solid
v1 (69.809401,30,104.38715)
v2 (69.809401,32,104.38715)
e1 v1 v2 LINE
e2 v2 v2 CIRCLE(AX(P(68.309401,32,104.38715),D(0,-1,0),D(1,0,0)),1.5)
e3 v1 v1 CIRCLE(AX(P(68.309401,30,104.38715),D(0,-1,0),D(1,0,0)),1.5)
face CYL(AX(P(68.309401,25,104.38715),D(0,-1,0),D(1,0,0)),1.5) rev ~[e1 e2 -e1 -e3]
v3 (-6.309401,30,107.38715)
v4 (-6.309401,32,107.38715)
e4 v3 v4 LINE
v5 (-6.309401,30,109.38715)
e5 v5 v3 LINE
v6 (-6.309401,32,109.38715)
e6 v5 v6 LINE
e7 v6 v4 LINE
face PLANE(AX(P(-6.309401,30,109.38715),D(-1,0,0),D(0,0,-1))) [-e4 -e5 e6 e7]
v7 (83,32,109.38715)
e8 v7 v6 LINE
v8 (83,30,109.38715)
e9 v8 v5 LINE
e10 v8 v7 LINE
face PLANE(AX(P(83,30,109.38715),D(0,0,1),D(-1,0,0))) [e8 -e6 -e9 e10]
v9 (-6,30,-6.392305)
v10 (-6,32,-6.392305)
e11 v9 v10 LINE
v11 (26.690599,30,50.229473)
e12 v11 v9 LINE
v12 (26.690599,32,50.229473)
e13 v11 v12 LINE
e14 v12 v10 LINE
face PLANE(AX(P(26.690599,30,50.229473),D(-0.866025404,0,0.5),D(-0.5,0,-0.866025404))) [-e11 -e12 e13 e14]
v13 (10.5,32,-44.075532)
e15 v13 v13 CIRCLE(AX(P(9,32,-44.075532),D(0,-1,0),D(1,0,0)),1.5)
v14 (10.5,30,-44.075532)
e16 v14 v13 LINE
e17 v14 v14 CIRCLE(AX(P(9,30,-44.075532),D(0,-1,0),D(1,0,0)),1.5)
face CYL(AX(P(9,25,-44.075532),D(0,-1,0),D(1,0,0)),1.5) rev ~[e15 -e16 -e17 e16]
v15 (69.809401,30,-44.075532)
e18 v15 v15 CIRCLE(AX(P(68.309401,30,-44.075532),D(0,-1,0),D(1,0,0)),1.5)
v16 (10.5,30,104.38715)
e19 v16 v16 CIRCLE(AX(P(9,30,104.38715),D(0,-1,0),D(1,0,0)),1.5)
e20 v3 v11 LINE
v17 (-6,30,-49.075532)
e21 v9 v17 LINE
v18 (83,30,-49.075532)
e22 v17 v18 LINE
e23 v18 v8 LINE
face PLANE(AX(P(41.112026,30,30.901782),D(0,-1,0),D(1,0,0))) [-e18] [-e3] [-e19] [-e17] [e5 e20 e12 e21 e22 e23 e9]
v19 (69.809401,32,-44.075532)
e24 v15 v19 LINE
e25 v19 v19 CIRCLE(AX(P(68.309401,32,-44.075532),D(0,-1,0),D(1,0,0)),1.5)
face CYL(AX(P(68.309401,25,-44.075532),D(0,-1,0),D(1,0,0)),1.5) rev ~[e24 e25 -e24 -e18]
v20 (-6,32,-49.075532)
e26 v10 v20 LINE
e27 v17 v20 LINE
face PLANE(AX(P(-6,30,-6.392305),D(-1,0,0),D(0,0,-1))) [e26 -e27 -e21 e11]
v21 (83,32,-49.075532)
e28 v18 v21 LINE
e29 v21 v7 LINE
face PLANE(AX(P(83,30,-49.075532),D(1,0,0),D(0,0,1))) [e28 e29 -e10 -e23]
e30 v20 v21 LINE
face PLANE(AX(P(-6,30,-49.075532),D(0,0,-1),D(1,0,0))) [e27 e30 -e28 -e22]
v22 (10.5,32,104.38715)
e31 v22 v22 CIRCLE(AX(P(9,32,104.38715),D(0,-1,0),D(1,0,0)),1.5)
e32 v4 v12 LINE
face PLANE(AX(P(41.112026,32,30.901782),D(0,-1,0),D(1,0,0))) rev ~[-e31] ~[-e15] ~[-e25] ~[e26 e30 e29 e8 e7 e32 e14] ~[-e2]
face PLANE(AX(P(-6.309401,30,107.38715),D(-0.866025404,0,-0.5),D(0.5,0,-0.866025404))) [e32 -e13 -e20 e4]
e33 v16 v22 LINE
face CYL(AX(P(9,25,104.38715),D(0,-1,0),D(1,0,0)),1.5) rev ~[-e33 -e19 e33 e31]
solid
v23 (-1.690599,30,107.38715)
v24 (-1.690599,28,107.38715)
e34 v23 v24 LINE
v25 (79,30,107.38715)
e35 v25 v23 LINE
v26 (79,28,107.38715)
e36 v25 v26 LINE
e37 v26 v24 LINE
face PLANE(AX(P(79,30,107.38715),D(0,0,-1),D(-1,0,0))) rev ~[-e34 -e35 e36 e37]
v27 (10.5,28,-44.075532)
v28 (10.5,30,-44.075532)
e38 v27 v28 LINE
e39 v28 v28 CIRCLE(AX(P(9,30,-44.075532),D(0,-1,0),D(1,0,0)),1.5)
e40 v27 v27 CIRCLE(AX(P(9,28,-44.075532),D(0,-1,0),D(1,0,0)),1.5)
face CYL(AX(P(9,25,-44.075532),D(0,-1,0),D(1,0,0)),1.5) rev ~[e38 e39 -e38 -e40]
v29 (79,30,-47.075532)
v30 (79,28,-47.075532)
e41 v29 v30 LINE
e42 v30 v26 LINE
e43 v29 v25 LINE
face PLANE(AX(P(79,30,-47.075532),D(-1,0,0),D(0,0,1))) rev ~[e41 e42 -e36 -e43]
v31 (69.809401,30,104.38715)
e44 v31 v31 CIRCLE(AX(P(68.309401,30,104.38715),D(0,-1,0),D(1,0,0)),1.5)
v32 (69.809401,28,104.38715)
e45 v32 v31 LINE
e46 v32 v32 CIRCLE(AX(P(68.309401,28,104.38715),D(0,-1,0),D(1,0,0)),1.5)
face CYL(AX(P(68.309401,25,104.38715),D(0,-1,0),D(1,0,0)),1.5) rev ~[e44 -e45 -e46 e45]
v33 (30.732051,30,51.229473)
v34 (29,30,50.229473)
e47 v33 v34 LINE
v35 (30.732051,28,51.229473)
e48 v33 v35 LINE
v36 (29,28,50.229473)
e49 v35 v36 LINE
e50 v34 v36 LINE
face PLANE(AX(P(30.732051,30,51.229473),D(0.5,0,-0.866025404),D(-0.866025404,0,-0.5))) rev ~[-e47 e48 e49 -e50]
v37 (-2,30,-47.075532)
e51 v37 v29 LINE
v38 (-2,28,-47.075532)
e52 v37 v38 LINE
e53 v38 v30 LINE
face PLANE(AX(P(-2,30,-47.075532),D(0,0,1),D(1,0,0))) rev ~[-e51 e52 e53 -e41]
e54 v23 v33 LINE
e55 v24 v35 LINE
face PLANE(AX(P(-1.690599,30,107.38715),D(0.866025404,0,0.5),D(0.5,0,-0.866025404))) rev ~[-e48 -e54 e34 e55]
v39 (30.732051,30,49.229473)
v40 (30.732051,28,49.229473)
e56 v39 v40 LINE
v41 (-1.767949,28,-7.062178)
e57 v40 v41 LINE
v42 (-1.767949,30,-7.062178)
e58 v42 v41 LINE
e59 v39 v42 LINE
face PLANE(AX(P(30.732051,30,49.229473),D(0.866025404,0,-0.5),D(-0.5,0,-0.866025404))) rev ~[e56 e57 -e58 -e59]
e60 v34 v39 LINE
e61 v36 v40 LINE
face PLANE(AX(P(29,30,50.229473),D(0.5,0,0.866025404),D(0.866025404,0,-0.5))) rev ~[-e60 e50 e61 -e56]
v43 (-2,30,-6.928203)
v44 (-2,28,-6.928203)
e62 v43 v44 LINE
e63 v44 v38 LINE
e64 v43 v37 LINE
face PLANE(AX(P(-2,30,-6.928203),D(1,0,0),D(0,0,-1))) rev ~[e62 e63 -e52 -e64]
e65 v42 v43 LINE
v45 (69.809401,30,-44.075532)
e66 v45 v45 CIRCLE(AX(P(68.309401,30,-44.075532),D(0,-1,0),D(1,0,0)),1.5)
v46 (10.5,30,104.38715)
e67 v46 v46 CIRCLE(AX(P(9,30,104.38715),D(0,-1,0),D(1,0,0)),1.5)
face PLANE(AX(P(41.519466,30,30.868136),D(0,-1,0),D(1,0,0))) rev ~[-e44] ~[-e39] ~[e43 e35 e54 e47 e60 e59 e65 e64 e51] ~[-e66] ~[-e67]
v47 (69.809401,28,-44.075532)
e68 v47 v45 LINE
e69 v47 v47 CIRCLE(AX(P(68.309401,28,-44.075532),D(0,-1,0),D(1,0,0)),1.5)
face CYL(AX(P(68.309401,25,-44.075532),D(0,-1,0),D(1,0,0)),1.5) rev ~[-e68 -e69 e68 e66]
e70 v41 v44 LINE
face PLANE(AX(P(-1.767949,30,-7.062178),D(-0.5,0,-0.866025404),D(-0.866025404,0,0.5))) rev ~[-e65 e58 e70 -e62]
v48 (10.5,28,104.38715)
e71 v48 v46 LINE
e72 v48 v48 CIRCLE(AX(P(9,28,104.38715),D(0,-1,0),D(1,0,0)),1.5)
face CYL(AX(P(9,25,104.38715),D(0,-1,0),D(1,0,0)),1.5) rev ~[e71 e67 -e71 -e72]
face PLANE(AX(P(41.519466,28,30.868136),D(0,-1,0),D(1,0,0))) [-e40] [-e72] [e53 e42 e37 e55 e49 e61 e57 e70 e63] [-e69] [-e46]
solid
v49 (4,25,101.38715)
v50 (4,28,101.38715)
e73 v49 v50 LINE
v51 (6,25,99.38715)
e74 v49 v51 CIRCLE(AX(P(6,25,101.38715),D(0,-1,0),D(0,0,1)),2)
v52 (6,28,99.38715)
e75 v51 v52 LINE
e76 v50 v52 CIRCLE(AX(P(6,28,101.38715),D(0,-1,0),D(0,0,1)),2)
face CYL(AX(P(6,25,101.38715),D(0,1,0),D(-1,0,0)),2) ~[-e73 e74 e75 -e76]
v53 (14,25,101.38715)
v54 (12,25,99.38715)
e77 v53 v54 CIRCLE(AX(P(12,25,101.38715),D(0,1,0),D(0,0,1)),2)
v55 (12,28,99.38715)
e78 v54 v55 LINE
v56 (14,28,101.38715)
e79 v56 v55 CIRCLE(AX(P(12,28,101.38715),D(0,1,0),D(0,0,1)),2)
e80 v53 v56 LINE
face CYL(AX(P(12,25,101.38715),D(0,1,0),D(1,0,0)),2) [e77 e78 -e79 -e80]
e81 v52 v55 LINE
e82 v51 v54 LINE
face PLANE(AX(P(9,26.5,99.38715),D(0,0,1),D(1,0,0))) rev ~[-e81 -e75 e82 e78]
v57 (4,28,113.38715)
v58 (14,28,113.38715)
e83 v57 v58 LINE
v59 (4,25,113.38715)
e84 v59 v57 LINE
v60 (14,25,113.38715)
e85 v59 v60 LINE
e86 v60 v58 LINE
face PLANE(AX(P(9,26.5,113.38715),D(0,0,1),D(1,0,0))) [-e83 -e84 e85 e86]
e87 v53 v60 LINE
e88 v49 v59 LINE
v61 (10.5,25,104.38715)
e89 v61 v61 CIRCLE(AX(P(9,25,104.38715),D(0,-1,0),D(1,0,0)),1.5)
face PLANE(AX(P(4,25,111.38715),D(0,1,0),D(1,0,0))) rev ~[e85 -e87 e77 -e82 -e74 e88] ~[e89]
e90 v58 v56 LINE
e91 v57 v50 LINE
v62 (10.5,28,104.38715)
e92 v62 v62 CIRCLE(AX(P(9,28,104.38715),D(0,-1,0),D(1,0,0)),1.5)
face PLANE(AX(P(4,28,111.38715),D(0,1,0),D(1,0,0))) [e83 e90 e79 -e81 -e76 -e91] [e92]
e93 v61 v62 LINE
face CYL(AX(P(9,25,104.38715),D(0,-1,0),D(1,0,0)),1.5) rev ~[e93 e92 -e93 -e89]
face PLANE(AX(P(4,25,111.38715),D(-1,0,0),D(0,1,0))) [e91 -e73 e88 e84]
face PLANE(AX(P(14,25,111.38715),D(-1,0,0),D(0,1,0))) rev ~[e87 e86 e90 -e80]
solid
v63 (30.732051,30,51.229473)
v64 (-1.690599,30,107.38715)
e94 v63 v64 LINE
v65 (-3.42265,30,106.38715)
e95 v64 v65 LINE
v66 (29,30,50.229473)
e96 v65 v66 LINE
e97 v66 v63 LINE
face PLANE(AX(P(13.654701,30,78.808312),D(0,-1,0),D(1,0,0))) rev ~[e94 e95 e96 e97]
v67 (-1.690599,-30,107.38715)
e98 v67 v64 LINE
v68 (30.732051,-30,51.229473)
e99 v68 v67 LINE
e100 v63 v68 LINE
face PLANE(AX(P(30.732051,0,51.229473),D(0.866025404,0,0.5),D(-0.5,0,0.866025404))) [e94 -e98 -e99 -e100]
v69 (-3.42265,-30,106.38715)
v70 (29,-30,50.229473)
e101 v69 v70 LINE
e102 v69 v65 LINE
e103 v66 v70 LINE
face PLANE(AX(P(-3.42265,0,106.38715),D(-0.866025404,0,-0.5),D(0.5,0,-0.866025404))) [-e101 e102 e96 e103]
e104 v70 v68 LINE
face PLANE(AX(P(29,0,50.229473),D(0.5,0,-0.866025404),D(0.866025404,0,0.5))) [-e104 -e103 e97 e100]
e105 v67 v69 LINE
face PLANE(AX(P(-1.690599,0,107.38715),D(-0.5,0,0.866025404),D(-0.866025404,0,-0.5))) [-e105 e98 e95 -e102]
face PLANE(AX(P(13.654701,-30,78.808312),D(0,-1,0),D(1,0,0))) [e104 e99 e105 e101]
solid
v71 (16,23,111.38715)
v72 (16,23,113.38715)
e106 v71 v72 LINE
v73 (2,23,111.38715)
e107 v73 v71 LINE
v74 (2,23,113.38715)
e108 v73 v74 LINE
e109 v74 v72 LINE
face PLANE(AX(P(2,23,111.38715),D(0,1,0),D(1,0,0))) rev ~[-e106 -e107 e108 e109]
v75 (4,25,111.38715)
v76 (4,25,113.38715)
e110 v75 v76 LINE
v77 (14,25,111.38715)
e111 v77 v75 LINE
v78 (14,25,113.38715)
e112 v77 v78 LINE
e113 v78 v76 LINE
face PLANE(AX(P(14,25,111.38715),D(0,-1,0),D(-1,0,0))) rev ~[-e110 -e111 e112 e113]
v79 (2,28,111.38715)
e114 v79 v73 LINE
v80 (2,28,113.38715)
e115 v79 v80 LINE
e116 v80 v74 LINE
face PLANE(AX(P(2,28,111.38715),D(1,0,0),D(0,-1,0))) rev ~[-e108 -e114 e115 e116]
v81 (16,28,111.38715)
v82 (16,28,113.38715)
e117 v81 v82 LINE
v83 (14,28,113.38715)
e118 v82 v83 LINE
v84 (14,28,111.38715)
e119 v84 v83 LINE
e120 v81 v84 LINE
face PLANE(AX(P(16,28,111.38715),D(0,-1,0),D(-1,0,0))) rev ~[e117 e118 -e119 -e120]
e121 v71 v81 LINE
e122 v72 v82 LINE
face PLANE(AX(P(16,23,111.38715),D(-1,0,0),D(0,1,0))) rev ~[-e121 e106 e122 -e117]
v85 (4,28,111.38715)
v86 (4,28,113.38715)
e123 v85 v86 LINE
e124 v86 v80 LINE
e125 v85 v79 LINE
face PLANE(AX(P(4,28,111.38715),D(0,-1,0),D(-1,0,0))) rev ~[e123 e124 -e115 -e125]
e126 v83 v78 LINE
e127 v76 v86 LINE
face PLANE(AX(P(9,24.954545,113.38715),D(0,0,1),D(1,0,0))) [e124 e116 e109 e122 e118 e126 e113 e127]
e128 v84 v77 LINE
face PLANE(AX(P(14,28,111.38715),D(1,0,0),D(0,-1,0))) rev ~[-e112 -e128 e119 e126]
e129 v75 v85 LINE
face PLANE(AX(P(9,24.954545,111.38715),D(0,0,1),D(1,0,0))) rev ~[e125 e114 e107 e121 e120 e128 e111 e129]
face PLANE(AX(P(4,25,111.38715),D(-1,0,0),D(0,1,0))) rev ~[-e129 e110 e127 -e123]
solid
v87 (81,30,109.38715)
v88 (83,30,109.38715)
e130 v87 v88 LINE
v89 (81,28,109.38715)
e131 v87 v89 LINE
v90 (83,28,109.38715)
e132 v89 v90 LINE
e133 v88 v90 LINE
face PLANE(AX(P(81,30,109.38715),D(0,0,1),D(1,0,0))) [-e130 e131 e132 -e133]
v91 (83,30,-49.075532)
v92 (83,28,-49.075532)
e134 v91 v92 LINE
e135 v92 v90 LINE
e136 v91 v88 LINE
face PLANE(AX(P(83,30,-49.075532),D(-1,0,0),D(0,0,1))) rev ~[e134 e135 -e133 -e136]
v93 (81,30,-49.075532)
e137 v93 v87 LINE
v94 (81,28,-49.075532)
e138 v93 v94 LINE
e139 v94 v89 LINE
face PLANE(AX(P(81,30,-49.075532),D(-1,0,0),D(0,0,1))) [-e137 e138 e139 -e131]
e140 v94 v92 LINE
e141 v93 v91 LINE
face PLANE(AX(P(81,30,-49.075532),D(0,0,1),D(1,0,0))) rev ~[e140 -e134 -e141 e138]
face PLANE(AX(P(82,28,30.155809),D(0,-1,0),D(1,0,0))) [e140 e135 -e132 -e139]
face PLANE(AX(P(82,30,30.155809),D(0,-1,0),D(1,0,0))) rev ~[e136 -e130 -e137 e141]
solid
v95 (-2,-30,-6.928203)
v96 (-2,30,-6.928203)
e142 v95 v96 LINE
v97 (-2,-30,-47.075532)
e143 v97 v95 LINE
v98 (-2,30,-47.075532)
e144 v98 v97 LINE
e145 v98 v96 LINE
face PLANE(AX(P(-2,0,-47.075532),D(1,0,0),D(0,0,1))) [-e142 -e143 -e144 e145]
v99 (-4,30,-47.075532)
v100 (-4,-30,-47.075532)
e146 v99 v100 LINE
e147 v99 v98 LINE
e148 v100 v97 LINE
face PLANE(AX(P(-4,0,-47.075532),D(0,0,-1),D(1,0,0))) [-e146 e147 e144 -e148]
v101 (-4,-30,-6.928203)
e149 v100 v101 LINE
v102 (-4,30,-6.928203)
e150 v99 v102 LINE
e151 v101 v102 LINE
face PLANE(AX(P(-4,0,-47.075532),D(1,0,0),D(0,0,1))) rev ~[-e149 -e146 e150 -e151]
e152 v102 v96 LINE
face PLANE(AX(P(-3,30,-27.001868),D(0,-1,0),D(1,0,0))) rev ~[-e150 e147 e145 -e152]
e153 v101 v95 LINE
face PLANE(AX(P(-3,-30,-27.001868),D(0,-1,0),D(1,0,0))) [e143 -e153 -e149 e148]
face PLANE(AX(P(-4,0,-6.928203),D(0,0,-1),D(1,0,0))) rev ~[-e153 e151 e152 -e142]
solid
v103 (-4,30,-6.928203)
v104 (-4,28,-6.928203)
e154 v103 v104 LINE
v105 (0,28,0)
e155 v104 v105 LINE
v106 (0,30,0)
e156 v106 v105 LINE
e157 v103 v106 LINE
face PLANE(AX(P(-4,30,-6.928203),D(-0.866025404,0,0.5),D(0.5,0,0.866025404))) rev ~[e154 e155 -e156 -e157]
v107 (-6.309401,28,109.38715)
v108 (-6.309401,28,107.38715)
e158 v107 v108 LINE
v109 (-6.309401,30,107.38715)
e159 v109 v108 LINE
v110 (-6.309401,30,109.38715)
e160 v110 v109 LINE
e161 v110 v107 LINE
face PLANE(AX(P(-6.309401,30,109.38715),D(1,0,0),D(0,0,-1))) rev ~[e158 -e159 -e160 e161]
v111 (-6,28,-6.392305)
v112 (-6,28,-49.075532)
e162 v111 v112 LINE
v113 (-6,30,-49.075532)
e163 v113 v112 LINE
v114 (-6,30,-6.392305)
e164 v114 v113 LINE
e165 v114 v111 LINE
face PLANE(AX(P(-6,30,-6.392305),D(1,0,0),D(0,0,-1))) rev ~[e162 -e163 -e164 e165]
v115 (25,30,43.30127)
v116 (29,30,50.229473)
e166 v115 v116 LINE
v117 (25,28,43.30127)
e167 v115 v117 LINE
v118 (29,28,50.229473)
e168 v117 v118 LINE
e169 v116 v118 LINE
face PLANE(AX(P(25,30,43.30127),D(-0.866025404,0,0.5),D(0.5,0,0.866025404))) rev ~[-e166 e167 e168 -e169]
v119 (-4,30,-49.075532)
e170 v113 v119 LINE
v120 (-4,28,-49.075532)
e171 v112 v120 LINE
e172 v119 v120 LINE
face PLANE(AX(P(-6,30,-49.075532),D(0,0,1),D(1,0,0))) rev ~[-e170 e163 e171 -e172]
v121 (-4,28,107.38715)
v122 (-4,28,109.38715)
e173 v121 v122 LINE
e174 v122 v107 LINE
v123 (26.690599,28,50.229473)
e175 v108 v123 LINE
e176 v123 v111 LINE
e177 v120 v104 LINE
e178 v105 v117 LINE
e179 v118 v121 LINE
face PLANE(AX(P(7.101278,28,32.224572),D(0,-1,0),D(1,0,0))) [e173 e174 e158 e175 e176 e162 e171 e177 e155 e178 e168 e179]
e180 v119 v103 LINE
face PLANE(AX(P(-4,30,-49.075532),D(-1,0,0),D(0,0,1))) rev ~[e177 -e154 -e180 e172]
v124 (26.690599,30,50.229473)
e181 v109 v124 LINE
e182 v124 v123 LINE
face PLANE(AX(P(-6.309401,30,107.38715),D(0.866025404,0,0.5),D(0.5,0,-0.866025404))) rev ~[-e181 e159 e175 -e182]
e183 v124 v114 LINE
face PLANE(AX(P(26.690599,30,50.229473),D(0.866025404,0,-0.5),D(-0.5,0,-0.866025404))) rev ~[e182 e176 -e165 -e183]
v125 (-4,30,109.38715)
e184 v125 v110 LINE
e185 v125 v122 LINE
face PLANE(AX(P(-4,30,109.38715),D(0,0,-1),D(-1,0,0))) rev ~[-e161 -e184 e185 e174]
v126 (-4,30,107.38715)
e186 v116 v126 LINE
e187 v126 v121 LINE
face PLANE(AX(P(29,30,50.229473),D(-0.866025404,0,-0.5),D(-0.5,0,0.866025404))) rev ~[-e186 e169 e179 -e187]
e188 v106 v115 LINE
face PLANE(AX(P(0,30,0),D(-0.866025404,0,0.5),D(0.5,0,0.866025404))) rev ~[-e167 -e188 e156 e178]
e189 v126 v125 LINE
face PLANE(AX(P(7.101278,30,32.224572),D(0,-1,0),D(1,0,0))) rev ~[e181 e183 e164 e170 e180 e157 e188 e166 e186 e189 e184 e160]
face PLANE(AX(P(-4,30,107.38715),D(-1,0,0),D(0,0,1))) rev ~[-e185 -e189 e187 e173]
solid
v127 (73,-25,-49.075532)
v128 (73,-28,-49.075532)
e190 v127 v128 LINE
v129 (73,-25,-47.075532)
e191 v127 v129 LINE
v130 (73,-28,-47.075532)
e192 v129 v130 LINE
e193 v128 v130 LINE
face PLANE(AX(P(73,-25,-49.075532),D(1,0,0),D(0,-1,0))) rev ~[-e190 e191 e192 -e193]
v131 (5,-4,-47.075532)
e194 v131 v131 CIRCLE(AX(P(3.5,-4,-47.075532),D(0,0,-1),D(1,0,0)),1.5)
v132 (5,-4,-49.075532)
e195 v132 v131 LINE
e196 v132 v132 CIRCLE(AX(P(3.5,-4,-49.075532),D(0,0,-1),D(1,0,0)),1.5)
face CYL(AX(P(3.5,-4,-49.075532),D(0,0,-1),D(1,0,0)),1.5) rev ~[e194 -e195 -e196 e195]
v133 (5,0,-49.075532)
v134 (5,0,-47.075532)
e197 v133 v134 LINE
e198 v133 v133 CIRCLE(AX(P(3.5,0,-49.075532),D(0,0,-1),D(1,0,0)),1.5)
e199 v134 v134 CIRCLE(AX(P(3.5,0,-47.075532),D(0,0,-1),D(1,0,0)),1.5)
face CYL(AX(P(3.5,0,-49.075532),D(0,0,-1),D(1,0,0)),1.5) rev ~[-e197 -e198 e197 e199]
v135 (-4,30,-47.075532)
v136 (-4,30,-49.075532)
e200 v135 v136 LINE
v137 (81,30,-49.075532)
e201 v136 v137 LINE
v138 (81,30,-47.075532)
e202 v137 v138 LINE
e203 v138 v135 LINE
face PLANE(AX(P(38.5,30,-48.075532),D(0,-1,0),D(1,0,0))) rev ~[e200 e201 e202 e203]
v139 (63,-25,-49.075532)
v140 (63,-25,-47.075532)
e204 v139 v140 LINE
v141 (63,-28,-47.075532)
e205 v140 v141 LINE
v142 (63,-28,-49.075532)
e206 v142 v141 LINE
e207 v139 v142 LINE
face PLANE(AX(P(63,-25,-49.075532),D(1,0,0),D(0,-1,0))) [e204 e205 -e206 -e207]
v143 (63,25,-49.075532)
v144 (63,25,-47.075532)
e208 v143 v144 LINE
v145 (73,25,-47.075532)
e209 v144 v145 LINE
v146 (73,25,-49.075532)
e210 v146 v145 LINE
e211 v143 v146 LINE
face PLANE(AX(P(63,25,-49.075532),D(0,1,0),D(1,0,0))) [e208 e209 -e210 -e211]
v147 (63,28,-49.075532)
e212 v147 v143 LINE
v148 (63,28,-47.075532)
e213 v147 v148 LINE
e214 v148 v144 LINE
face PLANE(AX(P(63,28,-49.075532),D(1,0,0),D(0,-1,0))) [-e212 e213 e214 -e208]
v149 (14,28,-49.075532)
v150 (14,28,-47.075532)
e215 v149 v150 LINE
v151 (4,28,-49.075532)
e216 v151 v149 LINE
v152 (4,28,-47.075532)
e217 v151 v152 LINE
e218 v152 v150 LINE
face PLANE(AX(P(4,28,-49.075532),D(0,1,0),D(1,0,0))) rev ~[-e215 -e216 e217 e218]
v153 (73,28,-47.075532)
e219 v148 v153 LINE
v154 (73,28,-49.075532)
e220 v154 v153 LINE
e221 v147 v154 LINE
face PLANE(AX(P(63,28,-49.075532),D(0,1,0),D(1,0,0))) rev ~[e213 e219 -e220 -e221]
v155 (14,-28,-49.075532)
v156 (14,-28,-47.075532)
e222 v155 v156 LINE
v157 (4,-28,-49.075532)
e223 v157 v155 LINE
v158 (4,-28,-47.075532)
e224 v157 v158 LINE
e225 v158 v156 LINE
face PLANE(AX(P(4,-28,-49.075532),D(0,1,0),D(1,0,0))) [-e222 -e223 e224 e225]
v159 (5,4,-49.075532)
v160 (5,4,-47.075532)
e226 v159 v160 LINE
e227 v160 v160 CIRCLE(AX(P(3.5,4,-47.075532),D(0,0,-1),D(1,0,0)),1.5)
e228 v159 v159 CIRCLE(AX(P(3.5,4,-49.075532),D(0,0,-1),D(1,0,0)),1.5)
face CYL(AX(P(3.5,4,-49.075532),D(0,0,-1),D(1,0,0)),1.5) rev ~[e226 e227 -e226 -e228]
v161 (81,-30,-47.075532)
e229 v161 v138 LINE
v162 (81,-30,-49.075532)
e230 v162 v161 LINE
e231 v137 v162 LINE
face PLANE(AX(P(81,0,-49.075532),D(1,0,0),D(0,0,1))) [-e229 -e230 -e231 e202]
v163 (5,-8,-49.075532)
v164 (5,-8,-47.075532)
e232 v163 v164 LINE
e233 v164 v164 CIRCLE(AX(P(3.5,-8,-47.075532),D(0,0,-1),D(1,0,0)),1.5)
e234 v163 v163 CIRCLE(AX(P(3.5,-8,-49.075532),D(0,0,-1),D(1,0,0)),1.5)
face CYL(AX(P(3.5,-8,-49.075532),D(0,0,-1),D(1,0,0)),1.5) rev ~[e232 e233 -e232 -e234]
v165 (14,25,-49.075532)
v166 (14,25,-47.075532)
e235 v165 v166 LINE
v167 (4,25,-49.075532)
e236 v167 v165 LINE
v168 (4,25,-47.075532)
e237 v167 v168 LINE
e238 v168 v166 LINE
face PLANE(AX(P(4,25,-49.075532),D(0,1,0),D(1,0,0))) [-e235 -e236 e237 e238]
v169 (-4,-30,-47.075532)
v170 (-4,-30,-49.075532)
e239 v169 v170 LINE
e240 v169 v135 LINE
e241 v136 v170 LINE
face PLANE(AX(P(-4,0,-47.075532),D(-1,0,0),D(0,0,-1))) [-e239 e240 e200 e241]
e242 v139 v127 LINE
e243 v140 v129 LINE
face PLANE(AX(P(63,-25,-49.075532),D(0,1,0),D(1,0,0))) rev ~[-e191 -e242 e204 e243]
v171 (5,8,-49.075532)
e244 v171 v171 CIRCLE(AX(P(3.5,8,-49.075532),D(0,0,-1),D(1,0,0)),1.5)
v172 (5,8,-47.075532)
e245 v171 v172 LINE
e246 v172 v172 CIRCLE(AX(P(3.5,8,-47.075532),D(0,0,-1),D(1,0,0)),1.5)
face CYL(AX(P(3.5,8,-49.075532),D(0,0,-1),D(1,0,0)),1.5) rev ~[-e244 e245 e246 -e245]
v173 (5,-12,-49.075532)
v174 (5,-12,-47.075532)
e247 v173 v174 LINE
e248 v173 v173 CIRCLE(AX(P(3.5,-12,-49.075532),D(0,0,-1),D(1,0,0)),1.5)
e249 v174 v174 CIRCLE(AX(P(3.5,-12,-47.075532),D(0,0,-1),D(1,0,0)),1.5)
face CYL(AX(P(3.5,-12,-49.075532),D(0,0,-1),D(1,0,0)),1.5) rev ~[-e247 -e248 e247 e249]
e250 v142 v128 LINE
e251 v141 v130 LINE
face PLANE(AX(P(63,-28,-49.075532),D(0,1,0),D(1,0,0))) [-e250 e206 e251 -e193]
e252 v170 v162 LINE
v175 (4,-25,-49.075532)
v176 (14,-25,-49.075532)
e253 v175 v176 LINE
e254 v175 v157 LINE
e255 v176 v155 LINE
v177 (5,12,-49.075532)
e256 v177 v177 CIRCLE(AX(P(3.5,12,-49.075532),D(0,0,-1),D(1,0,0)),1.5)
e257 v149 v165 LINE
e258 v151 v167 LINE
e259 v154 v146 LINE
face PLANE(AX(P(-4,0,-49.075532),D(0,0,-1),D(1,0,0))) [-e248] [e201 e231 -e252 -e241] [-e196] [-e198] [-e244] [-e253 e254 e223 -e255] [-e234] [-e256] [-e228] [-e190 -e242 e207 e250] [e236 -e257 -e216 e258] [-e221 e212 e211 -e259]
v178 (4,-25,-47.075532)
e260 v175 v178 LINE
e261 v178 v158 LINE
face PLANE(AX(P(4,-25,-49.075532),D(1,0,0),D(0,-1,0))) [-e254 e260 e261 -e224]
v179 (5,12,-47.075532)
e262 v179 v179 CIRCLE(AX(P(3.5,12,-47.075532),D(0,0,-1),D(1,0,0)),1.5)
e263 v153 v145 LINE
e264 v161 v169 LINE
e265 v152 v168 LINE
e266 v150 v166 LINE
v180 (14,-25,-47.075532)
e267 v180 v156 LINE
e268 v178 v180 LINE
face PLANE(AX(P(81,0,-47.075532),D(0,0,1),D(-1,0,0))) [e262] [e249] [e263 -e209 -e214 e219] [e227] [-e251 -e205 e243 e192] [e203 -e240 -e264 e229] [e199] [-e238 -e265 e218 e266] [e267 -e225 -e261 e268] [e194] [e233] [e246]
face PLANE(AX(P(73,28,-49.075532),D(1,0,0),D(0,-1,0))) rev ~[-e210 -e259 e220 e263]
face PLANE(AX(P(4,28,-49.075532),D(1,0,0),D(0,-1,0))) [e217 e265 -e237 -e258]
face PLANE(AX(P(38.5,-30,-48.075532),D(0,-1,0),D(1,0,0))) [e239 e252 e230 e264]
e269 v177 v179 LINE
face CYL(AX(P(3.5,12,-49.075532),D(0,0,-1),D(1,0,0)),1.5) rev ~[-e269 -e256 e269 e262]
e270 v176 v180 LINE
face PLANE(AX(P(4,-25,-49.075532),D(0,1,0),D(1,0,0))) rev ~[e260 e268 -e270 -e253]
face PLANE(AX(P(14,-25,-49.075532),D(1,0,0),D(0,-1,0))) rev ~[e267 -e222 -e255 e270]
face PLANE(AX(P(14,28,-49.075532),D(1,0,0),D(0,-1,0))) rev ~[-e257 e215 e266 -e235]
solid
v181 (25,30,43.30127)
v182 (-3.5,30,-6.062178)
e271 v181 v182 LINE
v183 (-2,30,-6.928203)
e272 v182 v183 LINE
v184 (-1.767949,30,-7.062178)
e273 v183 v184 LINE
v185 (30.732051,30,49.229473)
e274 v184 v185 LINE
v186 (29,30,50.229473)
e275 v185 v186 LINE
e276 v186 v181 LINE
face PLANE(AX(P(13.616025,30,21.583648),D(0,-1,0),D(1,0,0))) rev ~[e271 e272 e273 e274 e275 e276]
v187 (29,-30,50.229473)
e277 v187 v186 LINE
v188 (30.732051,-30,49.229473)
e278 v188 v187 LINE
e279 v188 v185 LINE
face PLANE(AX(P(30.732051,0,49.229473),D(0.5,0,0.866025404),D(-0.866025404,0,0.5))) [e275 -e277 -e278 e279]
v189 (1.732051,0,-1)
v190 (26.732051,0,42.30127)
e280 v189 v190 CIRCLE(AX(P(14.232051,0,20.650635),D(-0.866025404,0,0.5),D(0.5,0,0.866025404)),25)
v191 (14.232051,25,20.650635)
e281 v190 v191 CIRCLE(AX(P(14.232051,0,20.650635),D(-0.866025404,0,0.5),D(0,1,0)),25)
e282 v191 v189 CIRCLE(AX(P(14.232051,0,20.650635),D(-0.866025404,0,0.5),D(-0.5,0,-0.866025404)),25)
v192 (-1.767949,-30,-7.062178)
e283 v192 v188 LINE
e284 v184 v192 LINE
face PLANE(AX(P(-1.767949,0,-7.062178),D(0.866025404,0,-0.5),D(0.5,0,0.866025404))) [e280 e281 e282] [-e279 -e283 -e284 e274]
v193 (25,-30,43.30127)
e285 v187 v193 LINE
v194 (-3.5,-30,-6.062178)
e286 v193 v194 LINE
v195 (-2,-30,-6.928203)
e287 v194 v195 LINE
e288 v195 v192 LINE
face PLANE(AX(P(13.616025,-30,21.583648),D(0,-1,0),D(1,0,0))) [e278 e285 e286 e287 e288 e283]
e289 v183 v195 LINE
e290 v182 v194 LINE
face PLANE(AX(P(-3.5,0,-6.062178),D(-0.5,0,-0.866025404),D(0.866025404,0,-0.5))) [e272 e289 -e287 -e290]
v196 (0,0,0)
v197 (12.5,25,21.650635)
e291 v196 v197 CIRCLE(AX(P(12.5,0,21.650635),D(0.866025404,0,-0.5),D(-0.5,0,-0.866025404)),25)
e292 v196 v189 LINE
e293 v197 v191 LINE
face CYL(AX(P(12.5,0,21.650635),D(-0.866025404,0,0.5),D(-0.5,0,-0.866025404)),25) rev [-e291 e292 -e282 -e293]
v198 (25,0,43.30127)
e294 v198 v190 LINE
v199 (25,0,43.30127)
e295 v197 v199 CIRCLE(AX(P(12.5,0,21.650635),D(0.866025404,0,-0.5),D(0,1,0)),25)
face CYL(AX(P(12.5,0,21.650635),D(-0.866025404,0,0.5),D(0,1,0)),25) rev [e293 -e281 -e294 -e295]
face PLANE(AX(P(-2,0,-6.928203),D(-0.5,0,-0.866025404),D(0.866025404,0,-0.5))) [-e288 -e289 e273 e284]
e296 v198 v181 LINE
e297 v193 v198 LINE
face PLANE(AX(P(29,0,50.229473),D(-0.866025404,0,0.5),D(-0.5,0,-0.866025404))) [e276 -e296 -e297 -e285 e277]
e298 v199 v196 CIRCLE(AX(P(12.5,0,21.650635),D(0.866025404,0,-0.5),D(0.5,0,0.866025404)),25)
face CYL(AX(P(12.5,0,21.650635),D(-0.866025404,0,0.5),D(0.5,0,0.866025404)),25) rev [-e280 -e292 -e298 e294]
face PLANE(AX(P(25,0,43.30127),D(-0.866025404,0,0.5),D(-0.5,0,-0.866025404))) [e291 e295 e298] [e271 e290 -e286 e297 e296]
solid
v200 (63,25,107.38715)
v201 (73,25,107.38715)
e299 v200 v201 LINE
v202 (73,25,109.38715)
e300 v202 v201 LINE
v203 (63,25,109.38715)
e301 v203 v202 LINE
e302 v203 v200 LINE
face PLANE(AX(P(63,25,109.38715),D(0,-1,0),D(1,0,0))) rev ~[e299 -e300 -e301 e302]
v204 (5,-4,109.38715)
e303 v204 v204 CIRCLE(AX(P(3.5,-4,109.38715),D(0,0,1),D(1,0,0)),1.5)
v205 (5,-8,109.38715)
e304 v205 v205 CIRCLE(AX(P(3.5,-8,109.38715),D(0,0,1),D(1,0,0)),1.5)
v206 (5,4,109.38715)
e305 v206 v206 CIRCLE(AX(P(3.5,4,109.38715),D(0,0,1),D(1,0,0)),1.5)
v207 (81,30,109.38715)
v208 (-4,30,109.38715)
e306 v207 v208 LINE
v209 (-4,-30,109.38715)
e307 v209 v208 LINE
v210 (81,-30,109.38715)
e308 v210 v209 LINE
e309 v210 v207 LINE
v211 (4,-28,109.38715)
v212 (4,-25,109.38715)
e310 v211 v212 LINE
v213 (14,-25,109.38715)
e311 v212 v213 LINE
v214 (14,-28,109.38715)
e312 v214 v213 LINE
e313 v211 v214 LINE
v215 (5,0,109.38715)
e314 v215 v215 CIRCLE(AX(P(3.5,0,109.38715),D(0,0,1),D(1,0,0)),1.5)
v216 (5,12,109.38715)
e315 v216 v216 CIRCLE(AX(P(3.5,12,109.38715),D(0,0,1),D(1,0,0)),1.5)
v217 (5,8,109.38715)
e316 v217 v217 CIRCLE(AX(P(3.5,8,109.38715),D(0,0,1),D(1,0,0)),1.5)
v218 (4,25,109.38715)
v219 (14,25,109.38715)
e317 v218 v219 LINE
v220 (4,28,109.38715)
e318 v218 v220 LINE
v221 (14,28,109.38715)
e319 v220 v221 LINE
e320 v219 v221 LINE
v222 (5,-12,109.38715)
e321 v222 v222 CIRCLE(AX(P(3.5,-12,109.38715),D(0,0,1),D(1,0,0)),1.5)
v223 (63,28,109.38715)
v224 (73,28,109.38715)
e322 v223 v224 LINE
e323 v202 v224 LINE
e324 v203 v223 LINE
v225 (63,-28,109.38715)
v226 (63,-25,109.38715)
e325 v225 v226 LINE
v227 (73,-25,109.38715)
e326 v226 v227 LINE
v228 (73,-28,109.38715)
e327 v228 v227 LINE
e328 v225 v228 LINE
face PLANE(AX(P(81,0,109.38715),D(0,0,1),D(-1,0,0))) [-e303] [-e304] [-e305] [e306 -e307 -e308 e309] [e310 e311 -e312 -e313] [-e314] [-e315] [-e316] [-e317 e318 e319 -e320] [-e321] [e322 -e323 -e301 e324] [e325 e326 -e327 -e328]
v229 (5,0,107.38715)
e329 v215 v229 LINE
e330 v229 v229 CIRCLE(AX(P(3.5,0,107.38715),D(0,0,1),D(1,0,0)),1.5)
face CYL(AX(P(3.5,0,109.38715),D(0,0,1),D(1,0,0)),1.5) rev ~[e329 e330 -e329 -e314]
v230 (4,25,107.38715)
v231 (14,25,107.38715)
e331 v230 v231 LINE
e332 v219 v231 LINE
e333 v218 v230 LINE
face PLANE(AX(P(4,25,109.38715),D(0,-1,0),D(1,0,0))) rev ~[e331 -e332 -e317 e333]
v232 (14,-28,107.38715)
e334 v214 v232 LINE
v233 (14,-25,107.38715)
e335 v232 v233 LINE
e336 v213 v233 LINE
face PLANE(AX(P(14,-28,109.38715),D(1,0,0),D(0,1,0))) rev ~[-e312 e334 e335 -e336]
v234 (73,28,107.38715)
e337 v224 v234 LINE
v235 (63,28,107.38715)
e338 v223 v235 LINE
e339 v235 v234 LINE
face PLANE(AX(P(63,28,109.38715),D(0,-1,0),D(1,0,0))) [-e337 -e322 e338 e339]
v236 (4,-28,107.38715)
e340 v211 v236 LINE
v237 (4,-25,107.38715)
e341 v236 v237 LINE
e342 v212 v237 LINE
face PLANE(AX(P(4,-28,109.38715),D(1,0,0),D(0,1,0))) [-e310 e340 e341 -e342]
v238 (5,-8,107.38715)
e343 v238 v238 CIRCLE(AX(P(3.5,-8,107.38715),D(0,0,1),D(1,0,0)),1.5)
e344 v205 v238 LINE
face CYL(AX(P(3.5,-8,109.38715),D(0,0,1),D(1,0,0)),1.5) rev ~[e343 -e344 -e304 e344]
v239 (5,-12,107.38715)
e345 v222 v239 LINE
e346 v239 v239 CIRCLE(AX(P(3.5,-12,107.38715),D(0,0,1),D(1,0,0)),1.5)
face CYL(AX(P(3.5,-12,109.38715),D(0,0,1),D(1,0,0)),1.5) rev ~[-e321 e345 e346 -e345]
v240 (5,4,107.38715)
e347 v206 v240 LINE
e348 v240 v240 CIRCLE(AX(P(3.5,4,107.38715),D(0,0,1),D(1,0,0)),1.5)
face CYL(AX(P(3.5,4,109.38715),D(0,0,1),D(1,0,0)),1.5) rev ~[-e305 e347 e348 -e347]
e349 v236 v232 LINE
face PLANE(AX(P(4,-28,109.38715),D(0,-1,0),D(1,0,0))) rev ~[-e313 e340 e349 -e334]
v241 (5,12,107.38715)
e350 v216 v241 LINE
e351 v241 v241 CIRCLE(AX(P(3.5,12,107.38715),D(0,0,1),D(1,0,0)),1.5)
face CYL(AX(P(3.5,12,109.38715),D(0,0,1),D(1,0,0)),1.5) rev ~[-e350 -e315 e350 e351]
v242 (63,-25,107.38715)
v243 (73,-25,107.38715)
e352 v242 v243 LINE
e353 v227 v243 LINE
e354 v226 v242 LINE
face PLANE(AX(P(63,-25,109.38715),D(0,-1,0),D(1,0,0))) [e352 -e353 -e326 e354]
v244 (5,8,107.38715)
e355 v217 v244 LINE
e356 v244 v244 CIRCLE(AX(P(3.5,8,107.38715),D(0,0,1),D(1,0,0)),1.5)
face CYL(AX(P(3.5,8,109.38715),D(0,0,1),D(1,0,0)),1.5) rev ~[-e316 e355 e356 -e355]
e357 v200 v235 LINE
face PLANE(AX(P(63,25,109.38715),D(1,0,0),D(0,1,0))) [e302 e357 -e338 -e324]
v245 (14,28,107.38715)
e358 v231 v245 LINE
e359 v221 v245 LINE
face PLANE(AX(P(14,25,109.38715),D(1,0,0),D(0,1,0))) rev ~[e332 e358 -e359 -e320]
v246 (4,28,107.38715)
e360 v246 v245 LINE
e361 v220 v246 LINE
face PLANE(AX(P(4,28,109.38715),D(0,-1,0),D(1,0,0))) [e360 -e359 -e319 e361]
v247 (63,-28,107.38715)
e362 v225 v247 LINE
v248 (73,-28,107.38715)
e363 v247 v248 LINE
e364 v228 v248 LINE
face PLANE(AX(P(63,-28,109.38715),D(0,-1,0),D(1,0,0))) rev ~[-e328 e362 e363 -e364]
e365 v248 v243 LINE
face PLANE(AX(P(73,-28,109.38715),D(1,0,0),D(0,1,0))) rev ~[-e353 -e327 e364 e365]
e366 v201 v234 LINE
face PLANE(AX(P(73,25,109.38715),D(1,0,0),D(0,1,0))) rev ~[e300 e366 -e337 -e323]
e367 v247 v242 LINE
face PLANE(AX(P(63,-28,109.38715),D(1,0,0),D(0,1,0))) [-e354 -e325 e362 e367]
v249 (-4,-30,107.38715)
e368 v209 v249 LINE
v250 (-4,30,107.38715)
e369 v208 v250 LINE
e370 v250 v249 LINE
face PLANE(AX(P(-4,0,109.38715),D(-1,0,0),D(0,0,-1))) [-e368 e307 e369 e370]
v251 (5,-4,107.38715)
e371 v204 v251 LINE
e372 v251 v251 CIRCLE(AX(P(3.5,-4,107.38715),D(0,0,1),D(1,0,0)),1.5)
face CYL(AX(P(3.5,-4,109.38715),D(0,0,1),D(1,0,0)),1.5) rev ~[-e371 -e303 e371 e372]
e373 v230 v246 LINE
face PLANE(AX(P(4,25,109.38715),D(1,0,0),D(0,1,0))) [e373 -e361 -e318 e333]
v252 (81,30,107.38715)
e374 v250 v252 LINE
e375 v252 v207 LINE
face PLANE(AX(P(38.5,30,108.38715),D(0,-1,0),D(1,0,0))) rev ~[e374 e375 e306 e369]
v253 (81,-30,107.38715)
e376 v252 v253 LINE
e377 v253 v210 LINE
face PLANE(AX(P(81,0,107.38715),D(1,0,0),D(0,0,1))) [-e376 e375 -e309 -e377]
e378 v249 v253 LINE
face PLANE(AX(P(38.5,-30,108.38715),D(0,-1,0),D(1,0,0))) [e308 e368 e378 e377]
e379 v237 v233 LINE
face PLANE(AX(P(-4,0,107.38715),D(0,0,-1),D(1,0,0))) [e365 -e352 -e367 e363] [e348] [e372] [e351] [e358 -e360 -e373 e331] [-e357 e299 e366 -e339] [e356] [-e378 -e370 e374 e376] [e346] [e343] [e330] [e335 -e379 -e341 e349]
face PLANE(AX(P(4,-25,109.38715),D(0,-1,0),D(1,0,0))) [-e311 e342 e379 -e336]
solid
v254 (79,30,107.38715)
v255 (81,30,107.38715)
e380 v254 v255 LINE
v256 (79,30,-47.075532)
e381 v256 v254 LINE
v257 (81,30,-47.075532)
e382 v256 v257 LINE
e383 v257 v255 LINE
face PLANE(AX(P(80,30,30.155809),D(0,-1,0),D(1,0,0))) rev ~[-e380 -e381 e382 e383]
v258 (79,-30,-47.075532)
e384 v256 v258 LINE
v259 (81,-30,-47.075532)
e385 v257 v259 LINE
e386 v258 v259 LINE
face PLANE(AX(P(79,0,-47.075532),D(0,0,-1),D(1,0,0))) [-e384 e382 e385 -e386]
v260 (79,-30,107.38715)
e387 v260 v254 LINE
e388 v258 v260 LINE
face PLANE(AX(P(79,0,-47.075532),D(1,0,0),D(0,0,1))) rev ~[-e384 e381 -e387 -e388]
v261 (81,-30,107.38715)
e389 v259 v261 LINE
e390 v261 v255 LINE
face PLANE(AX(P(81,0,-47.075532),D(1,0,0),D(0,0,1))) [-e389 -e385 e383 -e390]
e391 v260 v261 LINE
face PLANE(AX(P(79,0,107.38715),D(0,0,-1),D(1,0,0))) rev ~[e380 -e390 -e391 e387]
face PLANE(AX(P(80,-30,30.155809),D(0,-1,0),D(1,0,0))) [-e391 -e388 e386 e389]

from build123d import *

# Parameters (mm, degrees)
F7_DEPTH       = 30
F7_DEPTH_BACK  = 30
F1_W           = 2
F1_H           = 154.4626819264
F8_DEPTH       = 30
F8_DEPTH_BACK  = 30
F9_DEPTH       = 30
F9_DEPTH_BACK  = 30
F10_DEPTH      = 30
F10_DEPTH_BACK = 30
F1_H_2         = 40.1473286269
F11_DEPTH      = 30
F11_DEPTH_BACK = 30
F12_DEPTH      = 30
F12_DEPTH_BACK = 30
F13_DEPTH      = 25
F14_R          = 1.5
F14_W          = 10
F14_H          = 3
F15_DEPTH      = 2
F16_W          = 10
F16_H          = 3
F16_R          = 1.5
F17_DEPTH      = 2
F18_DEPTH      = 2
F5_W           = 2
F5_H           = 158.4626819264
F19_DEPTH      = 2
F20_DEPTH      = 2
F22_W          = 10
F22_H          = 3
F23_DEPTH      = 12
F23_DEPTH_BACK = 2
F24_DEPTH      = 2
F25_R          = 2
F26_R          = 1.5
F27_DEPTH      = 50


# Not quite as in the source:
# - a feature names something its author has since deleted; it is built from what else it names


with BuildPart() as f7:
    # F1 (on Front) → F7 (new body, two sides)
    with BuildSketch(Plane.XZ) as f7_sk:
        Polygon((-4, 109.3871500693), (-4, 107.3871500693), (-1.6905989232, 107.3871500693), (79, 107.3871500693), (81, 107.3871500693), (81, 109.3871500693), align=None)
    extrude(amount=F7_DEPTH)
    extrude(f7_sk.sketch, amount=-F7_DEPTH_BACK)

    # F14 (on face) → F15 (cut)
    with BuildSketch(Plane.XY.offset(109.3871500693)):
        with Locations((3.5, 12)):
            Circle(F14_R)
        with Locations((3.5, 8)):
            Circle(F14_R)
        with Locations((3.5, 4)):
            Circle(F14_R)
        with Locations((3.5, -4)):
            Circle(F14_R)
        with Locations((3.5, 0)):
            Circle(F14_R)
        with Locations((3.5, -8)):
            Circle(F14_R)
        with Locations((3.5, -12)):
            Circle(F14_R)
        with Locations((9, 26.5)):
            Rectangle(F14_W, F14_H)
        with Locations((68, 26.5)):
            Rectangle(F14_W, F14_H)
        with Locations((68, -26.5)):
            Rectangle(F14_W, F14_H)
        with Locations((9, -26.5)):
            Rectangle(F14_W, F14_H)
    extrude(amount=-F15_DEPTH, mode=Mode.SUBTRACT)


with BuildPart() as f8:
    # F1 (on Front) → F8 (new body, two sides)
    with BuildSketch(Plane.XZ) as f8_sk:
        with Locations((80, 30.1558091061)):
            Rectangle(F1_W, F1_H)
    extrude(amount=F8_DEPTH)
    extrude(f8_sk.sketch, amount=-F8_DEPTH_BACK)


with BuildPart() as f9:
    # F1 (on Front) → F9 (new body, two sides)
    with BuildSketch(Plane.XZ) as f9_sk:
        Polygon((-3.4226497308, 106.3871500693), (29, 50.2294734195), (30.7320508076, 51.2294734195), (-1.6905989232, 107.3871500693), align=None)
    extrude(amount=F9_DEPTH)
    extrude(f9_sk.sketch, amount=-F9_DEPTH_BACK)


with BuildPart() as f10:
    # F1 (on Front) → F10 (new body, two sides)
    with BuildSketch(Plane.XZ) as f10_sk:
        Polygon((25, 43.3012701892), (0, 0), (-3.5, -6.0621778265), (-2, -6.9282032303), (-1.7679491924, -7.0621778265), (30.7320508076, 49.2294734195), (29, 50.2294734195), align=None)
    extrude(amount=F10_DEPTH)
    extrude(f10_sk.sketch, amount=-F10_DEPTH_BACK)

    # F4 (on line) → F13 (cut)
    with BuildSketch(Plane(origin=(0, 0, 0), x_dir=(0, 1, 0), z_dir=(0.8660254038, 0, -0.5))):
        with BuildLine():
            Line((0, 50), (0, 0))
            ThreePointArc((0, 0), (17.6776695297, 7.3223304703), (25, 25))
            ThreePointArc((25, 25), (17.6776695297, 42.6776695297), (0, 50))
        make_face()
        with BuildLine():
            ThreePointArc((0, 50), (-25, 25), (0, 0))
            Line((0, 0), (0, 50))
        make_face()
    extrude(amount=F13_DEPTH, mode=Mode.SUBTRACT)


with BuildPart() as f11:
    # F1 (on Front) → F11 (new body, two sides)
    with BuildSketch(Plane.XZ) as f11_sk:
        with Locations((-3, -27.0018675437)):
            Rectangle(F1_W, F1_H_2)
    extrude(amount=F11_DEPTH)
    extrude(f11_sk.sketch, amount=-F11_DEPTH_BACK)


with BuildPart() as f12:
    # F1 (on Front) → F12 (new body, two sides)
    with BuildSketch(Plane.XZ) as f12_sk:
        Polygon((-2, -47.0755318572), (-4, -47.0755318572), (-4, -49.0755318572), (81, -49.0755318572), (81, -47.0755318572), (79, -47.0755318572), align=None)
    extrude(amount=F12_DEPTH)
    extrude(f12_sk.sketch, amount=-F12_DEPTH_BACK)

    # F16 (on face) → F17 (cut)
    with BuildSketch(Plane(origin=(0, 0, -49.0755318572), x_dir=(1, 0, 0), z_dir=(0, 0, -1))):
        with Locations((9, -26.5)):
            Rectangle(F16_W, F16_H)
        with Locations((3.5, -12)):
            Circle(F16_R)
        with Locations((3.5, -8)):
            Circle(F16_R)
        with Locations((3.5, -4)):
            Circle(F16_R)
        with Locations((3.5, 0)):
            Circle(F16_R)
        with Locations((3.5, 4)):
            Circle(F16_R)
        with Locations((3.5, 8)):
            Circle(F16_R)
        with Locations((3.5, 12)):
            Circle(F16_R)
        with Locations((9, 26.5)):
            Rectangle(F16_W, F16_H)
        with Locations((68, 26.5)):
            Rectangle(F16_W, F16_H)
        with Locations((68, -26.5)):
            Rectangle(F16_W, F16_H)
    extrude(amount=-F17_DEPTH, mode=Mode.SUBTRACT)


with BuildPart() as f18:
    # F5 (on offset) → F18 (new body)
    with BuildSketch(Plane.XZ.offset(-30)):
        Polygon((-2, -6.9282032303), (-2, -47.0755318572), (79, -47.0755318572), (79, 107.3871500693), (-1.6905989232, 107.3871500693), (30.7320508076, 51.2294734195), (29, 50.2294734195), (30.7320508076, 49.2294734195), (-1.7679491924, -7.0621778265), align=None)
    extrude(amount=F18_DEPTH)


with BuildPart() as f19:
    # F5 (on offset) → F19 (new body)
    with BuildSketch(Plane.XZ.offset(-30)):
        with Locations((82, 30.1558091061)):
            Rectangle(F5_W, F5_H)
    extrude(amount=F19_DEPTH)


with BuildPart() as f19b:
    # F5 (on offset) → F19, piece 2 (new body)
    with BuildSketch(Plane.XZ.offset(-30)):
        Polygon((25, 43.3012701892), (29, 50.2294734195), (-4, 107.3871500693), (-4, 109.3871500693), (-6.3094010768, 109.3871500693), (-6.3094010768, 107.3871500693), (26.6905989232, 50.2294734195), (-6, -6.3923048454), (-6, -49.0755318572), (-4, -49.0755318572), (-4, -47.0755318572), (-4, -6.9282032303), (0, 0), align=None)
    extrude(amount=F19_DEPTH)


with BuildPart() as f20:
    # F6 (on offset) → F20 (new body)
    with BuildSketch(Plane.XZ.offset(-30)):
        Polygon((-4, -49.0755318572), (81, -49.0755318572), (83, -49.0755318572), (83, 109.3871500693), (81, 109.3871500693), (-4, 109.3871500693), (-6.3094010768, 109.3871500693), (-6.3094010768, 107.3871500693), (26.6905989232, 50.2294734195), (-6, -6.3923048454), (-6, -49.0755318572), align=None)
    extrude(amount=-F20_DEPTH)


with BuildPart() as f23:
    # F22 (on offset) → F23 (new body, two sides)
    with BuildSketch(Plane.XY.offset(111.3871500693)) as f23_sk:
        with Locations((9, 26.5)):
            Rectangle(F22_W, F22_H)
    extrude(amount=-F23_DEPTH)
    extrude(f23_sk.sketch, amount=F23_DEPTH_BACK)

    # F25
    f25_edges = [f23.edges().sort_by_distance(p)[0] for p in [
        (14, 26.5, 99.38715),
        (4, 26.5, 99.38715),
    ]]
    fillet(f25_edges, radius=F25_R)


with BuildPart() as f24:
    # F22 (on offset) → F24 (new body)
    with BuildSketch(Plane.XY.offset(111.3871500693)):
        Polygon((14, 28), (14, 25), (4, 25), (4, 28), (2, 28), (2, 23), (16, 23), (16, 28), align=None)
    extrude(amount=F24_DEPTH)


with BuildPart() as f27_tool:
    # F26 (on face) → F27 (new body)
    with BuildSketch(Plane.XZ.offset(-25)):
        with Locations((9, 104.3871500693)):
            Circle(F26_R)
        with Locations((68.3094010768, 104.3871500693)):
            Circle(F26_R)
        with Locations((9, -44.0755318572)):
            Circle(F26_R)
        with Locations((68.3094010768, -44.0755318572)):
            Circle(F26_R)
    extrude(amount=-F27_DEPTH)


with BuildPart() as f18_1:
    add(f18.part)

    # F27: cut by f27_tool
    add(f27_tool.part, mode=Mode.SUBTRACT)


with BuildPart() as f20_1:
    add(f20.part)

    # F27: cut by f27_tool
    add(f27_tool.part, mode=Mode.SUBTRACT)


with BuildPart() as f23_1:
    add(f23.part)

    # F27: cut by f27_tool
    add(f27_tool.part, mode=Mode.SUBTRACT)


solid = Compound([f7.part, f8.part, f9.part, f10.part, f11.part, f12.part, f19.part, f19b.part, f24.part, f18_1.part, f20_1.part, f23_1.part])
